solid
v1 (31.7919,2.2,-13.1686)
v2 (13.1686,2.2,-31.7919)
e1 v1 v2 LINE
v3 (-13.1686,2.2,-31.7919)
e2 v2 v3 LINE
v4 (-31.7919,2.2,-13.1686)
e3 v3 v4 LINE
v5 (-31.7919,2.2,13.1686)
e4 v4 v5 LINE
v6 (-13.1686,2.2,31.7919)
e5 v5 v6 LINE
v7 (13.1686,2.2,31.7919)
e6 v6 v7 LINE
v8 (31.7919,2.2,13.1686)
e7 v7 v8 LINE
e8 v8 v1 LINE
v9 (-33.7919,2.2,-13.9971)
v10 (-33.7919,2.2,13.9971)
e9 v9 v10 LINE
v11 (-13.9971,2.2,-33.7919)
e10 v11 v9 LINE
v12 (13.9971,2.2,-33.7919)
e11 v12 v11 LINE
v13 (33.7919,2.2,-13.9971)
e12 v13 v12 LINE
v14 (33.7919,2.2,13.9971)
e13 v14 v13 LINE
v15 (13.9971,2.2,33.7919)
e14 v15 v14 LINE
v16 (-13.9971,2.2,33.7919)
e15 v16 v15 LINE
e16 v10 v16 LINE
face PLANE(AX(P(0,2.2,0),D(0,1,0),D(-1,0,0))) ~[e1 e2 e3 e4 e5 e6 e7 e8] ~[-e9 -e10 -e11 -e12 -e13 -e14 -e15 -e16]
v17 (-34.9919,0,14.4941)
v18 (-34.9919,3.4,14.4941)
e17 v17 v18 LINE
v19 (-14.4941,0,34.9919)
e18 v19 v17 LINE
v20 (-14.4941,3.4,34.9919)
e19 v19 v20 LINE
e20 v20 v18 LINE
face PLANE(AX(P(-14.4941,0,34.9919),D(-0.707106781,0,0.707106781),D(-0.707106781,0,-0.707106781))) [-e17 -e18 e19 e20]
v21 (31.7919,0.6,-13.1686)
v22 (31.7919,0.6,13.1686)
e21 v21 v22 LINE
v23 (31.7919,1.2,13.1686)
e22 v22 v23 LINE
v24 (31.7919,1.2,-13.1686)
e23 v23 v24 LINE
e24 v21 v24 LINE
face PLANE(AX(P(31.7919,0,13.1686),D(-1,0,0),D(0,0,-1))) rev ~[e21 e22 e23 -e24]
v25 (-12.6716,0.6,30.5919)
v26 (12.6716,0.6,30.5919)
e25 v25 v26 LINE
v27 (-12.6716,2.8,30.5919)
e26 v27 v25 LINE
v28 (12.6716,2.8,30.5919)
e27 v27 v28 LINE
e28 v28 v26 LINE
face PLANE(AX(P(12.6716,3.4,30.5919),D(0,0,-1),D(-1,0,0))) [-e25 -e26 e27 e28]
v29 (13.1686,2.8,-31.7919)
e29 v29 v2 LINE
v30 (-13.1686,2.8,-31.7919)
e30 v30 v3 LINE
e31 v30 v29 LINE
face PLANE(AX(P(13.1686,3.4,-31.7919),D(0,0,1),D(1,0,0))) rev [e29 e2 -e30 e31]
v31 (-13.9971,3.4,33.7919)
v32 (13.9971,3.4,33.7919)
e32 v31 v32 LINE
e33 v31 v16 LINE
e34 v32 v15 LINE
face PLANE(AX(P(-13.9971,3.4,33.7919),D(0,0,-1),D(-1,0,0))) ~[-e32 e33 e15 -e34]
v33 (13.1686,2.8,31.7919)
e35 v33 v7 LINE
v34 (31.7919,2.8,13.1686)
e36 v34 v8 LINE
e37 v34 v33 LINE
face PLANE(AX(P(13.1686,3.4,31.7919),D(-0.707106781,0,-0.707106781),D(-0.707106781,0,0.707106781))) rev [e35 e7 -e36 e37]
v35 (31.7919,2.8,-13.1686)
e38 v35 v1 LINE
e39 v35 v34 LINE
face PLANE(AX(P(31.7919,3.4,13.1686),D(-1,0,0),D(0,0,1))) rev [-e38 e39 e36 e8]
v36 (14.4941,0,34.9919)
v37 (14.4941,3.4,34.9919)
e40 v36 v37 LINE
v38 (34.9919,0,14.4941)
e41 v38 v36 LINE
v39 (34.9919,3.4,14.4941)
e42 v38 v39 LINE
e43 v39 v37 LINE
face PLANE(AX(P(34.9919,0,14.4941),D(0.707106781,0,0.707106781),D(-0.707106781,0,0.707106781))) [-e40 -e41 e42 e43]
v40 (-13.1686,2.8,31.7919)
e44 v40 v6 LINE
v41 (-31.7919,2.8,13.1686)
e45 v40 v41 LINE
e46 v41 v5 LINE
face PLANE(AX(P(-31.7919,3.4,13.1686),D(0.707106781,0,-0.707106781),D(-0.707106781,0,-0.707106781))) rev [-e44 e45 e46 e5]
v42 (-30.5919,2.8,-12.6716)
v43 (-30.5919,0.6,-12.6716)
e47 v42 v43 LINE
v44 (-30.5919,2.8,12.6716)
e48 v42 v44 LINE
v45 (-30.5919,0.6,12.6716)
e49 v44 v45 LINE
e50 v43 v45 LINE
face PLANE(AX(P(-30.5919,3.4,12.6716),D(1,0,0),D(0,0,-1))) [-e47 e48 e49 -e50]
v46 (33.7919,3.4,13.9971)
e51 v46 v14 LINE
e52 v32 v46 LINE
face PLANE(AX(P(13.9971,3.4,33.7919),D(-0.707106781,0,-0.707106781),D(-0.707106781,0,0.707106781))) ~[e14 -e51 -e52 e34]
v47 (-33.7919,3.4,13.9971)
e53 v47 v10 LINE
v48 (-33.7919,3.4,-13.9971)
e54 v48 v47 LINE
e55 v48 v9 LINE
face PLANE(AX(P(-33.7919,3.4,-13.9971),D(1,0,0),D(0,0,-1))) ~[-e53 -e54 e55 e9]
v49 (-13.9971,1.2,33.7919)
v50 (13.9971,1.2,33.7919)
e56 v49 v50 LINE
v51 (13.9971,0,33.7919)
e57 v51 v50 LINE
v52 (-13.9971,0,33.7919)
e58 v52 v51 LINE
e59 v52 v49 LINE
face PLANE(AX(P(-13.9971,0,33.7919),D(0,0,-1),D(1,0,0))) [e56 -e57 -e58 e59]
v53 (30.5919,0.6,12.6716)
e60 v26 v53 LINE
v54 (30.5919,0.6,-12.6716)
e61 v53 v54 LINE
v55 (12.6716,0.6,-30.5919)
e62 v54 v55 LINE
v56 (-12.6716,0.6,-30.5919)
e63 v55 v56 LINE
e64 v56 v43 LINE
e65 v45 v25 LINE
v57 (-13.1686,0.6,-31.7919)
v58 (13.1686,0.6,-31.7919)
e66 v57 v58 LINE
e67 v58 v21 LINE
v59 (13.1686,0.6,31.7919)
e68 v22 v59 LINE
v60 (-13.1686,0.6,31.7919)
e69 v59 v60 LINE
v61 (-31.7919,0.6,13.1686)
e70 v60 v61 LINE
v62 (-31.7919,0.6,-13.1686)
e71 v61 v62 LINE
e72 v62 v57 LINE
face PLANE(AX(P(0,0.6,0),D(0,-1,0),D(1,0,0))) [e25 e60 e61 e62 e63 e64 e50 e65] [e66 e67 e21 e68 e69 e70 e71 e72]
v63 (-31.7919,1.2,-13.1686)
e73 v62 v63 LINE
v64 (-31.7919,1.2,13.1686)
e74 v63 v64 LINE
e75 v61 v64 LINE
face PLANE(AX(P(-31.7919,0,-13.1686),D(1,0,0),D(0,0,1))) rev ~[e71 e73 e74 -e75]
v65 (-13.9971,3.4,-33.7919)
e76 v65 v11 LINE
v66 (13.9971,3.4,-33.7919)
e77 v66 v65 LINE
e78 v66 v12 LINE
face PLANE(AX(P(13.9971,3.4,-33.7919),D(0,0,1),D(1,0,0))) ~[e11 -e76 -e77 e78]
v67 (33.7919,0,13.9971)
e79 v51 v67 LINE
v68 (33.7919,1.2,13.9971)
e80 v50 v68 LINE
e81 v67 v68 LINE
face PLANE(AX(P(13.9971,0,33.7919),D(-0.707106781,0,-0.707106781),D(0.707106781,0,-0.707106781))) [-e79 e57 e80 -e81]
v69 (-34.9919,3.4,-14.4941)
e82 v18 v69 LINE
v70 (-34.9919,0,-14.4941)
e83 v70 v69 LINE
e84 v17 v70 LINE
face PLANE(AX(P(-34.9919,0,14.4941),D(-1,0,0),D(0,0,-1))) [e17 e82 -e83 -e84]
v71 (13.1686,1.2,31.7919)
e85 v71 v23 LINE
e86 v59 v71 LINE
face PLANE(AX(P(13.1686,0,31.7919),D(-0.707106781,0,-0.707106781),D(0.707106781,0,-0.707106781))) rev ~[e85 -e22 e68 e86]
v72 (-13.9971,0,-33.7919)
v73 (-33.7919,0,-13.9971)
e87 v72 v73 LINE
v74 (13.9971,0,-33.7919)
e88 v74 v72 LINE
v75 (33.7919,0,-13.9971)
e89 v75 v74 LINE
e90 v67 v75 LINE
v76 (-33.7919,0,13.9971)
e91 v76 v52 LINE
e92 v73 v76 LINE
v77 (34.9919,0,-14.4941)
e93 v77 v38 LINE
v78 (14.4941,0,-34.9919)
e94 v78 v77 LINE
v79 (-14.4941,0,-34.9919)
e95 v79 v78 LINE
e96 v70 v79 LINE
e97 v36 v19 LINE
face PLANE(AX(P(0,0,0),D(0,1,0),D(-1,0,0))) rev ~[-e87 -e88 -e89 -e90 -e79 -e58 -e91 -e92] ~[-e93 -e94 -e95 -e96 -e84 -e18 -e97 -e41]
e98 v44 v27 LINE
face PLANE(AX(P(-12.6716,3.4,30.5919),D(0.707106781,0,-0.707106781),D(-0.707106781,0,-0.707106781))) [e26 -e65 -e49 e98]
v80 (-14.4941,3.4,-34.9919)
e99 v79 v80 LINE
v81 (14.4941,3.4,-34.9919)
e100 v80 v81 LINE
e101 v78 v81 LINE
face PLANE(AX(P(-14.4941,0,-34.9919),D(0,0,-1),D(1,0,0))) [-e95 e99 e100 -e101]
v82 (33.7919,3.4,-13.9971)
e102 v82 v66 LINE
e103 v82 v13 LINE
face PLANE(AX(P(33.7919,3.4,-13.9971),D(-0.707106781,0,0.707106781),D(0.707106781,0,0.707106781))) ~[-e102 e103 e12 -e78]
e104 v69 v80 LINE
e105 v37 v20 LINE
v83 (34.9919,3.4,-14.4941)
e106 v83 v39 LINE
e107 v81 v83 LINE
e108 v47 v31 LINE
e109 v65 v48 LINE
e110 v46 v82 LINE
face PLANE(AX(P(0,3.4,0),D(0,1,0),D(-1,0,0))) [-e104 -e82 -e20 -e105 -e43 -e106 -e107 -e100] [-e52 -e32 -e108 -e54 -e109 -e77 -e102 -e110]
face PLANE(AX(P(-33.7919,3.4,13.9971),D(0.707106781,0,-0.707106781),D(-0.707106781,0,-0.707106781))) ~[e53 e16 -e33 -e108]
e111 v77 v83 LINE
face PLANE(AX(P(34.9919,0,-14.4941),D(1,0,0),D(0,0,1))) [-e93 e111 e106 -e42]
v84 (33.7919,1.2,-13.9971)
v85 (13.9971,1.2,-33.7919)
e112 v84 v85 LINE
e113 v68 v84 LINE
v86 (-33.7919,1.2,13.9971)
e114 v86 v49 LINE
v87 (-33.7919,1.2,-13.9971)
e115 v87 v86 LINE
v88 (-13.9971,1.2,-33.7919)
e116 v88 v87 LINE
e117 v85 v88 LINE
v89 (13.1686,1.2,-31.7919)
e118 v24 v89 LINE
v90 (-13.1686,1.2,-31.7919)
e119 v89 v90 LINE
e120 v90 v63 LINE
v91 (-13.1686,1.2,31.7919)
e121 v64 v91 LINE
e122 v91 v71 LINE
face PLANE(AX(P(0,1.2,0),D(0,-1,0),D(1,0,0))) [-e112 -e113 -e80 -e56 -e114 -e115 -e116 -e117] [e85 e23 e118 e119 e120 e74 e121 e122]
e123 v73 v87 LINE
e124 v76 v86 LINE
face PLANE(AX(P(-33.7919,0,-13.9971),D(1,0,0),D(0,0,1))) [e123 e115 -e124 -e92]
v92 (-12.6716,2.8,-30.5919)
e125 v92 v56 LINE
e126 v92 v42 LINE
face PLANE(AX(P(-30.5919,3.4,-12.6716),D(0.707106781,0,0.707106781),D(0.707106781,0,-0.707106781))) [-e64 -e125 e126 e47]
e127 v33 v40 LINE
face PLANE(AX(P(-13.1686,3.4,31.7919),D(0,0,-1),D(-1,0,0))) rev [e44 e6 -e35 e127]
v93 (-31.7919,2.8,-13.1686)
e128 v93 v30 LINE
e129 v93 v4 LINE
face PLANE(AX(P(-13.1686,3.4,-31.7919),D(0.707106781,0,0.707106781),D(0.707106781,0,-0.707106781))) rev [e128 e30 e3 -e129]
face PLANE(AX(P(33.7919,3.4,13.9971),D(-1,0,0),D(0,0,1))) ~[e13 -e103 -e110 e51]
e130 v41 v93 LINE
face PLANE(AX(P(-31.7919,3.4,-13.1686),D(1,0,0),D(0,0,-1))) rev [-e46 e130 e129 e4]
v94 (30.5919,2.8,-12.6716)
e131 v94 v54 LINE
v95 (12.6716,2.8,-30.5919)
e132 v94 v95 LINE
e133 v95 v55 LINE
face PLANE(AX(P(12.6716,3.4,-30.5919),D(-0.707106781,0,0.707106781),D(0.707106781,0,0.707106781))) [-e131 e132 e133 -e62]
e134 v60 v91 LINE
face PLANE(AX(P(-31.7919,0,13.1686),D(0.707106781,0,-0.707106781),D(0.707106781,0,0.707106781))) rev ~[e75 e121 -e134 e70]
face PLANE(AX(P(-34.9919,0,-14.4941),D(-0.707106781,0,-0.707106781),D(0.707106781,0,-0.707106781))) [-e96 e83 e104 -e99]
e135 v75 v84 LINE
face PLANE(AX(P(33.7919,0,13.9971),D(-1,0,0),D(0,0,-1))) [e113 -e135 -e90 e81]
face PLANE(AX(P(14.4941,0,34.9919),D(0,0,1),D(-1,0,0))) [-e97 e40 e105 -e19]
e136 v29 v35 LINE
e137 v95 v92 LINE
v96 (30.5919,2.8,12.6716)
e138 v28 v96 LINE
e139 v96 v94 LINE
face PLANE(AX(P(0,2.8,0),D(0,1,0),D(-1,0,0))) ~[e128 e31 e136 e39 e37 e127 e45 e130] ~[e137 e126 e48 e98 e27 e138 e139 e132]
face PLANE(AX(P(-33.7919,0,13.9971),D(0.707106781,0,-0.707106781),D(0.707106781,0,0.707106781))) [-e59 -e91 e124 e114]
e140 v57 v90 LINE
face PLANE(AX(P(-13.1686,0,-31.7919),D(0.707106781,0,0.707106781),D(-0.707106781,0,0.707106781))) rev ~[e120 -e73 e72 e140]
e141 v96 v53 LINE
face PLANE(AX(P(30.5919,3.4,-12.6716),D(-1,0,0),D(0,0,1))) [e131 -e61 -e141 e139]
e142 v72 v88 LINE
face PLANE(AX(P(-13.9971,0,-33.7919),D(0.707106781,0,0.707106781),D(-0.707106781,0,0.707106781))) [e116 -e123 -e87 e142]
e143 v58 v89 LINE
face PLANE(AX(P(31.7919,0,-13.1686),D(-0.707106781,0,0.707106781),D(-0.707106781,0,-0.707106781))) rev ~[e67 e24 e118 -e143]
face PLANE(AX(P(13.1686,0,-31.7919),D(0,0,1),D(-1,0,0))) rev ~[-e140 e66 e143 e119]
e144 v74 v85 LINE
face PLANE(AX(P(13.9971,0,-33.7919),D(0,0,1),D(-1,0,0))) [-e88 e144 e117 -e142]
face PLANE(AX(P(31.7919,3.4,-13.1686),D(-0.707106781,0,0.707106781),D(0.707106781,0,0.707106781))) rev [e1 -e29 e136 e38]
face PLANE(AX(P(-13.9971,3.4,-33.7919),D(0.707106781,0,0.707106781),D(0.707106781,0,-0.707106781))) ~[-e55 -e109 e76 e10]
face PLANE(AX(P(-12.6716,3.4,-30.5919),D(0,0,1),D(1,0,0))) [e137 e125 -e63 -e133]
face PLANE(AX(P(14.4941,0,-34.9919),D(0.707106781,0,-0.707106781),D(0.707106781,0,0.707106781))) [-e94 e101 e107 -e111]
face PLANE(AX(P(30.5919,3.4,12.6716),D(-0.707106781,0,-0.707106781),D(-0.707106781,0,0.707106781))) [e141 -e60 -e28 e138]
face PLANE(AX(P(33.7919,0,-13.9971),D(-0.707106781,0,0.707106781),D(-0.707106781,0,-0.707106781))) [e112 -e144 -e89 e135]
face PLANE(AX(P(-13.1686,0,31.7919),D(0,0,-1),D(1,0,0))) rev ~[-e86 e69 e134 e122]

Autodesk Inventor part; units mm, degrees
ref_plane "YZ Plane" through (0, 0, 0) normal (1, 0, 0) x (0, 1, 0)
ref_plane "XZ Plane" through (0, 0, 0) normal (0, 1, 0) x (-1, 0, 0)
sketch "스케치1" plane through (0, 0, 0) normal (0, 1, 0) x (-1, 0, 0)
  line L0 (-32.5919, 13.5) -> (-13.5, 32.5919)
  line L1 (-13.5, 32.5919) -> (13.5, 32.5919)
  line L2 (13.5, 32.5919) -> (32.5919, 13.5)
  line L3 (32.5919, 13.5) -> (32.5919, -13.5)
  line L4 (32.5919, -13.5) -> (13.5, -32.5919)
  line L5 (13.5, -32.5919) -> (-13.5, -32.5919)
  line L6 (-13.5, -32.5919) -> (-32.5919, -13.5)
  line L7 (-32.5919, -13.5) -> (-32.5919, 13.5)
  line L8 (34.9919, 14.4941) -> (34.9919, -14.4941)
  line L9 (34.9919, -14.4941) -> (14.4941, -34.9919)
  line L10 (14.4941, -34.9919) -> (-14.4941, -34.9919)
  line L11 (-14.4941, -34.9919) -> (-34.9919, -14.4941)
  line L12 (-34.9919, -14.4941) -> (-34.9919, 14.4941)
  line L13 (-34.9919, 14.4941) -> (-14.4941, 34.9919)
  line L14 (-14.4941, 34.9919) -> (14.4941, 34.9919)
  line L15 (14.4941, 34.9919) -> (34.9919, 14.4941)
  point P0 (0, 0)
  point P1 (0, 0)
  point P2 (0, 0)
  dimension "d0" = 27
  dimension "d1" = 2.4
extrude "돌출1" add sketch "스케치1" along normal blind 3.4 contours L0 L1 L2 L3 L4 L5 L6 L7 | L8 L9 L10 L11 L12 L13 L14 L15
sketch "스케치3" plane through (0, 0, 0) normal (0, -1, 0) x (1, 0, 0)
  line L0 (-13.5, 32.5919) -> (13.5, 32.5919)
  line L1 (13.5, 32.5919) -> (32.5919, 13.5)
  line L2 (32.5919, 13.5) -> (32.5919, -13.5)
  line L3 (32.5919, -13.5) -> (13.5, -32.5919)
  line L4 (13.5, -32.5919) -> (-13.5, -32.5919)
  line L5 (-13.5, -32.5919) -> (-32.5919, -13.5)
  line L6 (-32.5919, -13.5) -> (-32.5919, 13.5)
  line L7 (-32.5919, 13.5) -> (-13.5, 32.5919)
  line L8 (-13.9971, 33.7919) -> (13.9971, 33.7919)
  line L9 (13.9971, 33.7919) -> (33.7919, 13.9971)
  line L10 (33.7919, 13.9971) -> (33.7919, -13.9971)
  line L11 (33.7919, -13.9971) -> (13.9971, -33.7919)
  line L12 (13.9971, -33.7919) -> (-13.9971, -33.7919)
  line L13 (-13.9971, -33.7919) -> (-33.7919, -13.9971)
  line L14 (-33.7919, -13.9971) -> (-33.7919, 13.9971)
  line L15 (-33.7919, 13.9971) -> (-13.9971, 33.7919)
  line L16 (-13.1686, 31.7919) -> (13.1686, 31.7919)
  line L17 (13.1686, 31.7919) -> (31.7919, 13.1686)
  line L18 (31.7919, 13.1686) -> (31.7919, -13.1686)
  line L19 (31.7919, -13.1686) -> (13.1686, -31.7919)
  line L20 (13.1686, -31.7919) -> (-13.1686, -31.7919)
  line L21 (-13.1686, -31.7919) -> (-31.7919, -13.1686)
  line L22 (-31.7919, -13.1686) -> (-31.7919, 13.1686)
  line L23 (-31.7919, 13.1686) -> (-13.1686, 31.7919)
  point P0 (0, 0)
  point P1 (0, 0)
  point P2 (0, 0)
  point P3 (0, 0)
  dimension "d8" = 27
  dimension "d9" = 1.2
  dimension "d19" = 0.8
extrude "돌출3" cut sketch "스케치3" against normal blind 1.2 contours L0 L1 L2 L3 L4 L5 L6 L7 | L8 L9 L10 L11 L12 L13 L14 L15
sketch "스케치4" plane through (0, 3.4, 0) normal (0, 1, 0) x (1, 0, 0)
  line L0 (12.6716, -30.5919) -> (-12.6716, -30.5919)
  line L1 (-12.6716, -30.5919) -> (-30.5919, -12.6716)
  line L2 (-30.5919, -12.6716) -> (-30.5919, 12.6716)
  line L3 (-30.5919, 12.6716) -> (-12.6716, 30.5919)
  line L4 (-12.6716, 30.5919) -> (12.6716, 30.5919)
  line L5 (12.6716, 30.5919) -> (30.5919, 12.6716)
  line L6 (30.5919, 12.6716) -> (30.5919, -12.6716)
  line L7 (30.5919, -12.6716) -> (12.6716, -30.5919)
  line L8 (-31.7919, -13.1686) -> (-31.7919, 13.1686) projected
  point P0 (0, 0)
  point P1 (0, 0)
  dimension "d21" = 1.2
extrude "돌출4" cut sketch "스케치4" against normal blind 5
ref_plane "작업 평면1" through (0, 1.7, 0) normal (0, 1, 0) x (1, 0, 0)
sketch "스케치6" plane through (0, 0, 0) normal (0, -1, 0) x (1, 0, 0)
  line L0 (30.5919, -12.6716) -> (12.6716, -30.5919) projected
  line L1 (12.6716, -30.5919) -> (-12.6716, -30.5919) projected
  line L2 (-12.6716, -30.5919) -> (-30.5919, -12.6716) projected
  line L3 (-30.5919, -12.6716) -> (-30.5919, 12.6716) projected
  line L4 (-30.5919, 12.6716) -> (-12.6716, 30.5919) projected
  line L5 (-12.6716, 30.5919) -> (12.6716, 30.5919) projected
  line L6 (12.6716, 30.5919) -> (30.5919, 12.6716) projected
  line L7 (30.5919, 12.6716) -> (30.5919, -12.6716) projected
  line L8 (31.7919, 13.1686) -> (13.1686, 31.7919) projected
  line L9 (13.1686, 31.7919) -> (-13.1686, 31.7919) projected
  line L10 (-13.1686, 31.7919) -> (-31.7919, 13.1686) projected
  line L11 (-31.7919, 13.1686) -> (-31.7919, -13.1686) projected
  line L12 (-31.7919, -13.1686) -> (-13.1686, -31.7919) projected
  line L13 (-13.1686, -31.7919) -> (13.1686, -31.7919) projected
  line L14 (13.1686, -31.7919) -> (31.7919, -13.1686) projected
  line L15 (31.7919, -13.1686) -> (31.7919, 13.1686) projected
  point P0 (0, 0)
extrude "돌출7" cut sketch "스케치6" against normal blind 0.6
mirror "미러2" about plane through (0, 1.7, 0) normal (0, 1, 0) of "돌출7", "돌출3"
properties part number "팔각형 OV-PAM 5패턴 링 - 틈 너비 수정"
